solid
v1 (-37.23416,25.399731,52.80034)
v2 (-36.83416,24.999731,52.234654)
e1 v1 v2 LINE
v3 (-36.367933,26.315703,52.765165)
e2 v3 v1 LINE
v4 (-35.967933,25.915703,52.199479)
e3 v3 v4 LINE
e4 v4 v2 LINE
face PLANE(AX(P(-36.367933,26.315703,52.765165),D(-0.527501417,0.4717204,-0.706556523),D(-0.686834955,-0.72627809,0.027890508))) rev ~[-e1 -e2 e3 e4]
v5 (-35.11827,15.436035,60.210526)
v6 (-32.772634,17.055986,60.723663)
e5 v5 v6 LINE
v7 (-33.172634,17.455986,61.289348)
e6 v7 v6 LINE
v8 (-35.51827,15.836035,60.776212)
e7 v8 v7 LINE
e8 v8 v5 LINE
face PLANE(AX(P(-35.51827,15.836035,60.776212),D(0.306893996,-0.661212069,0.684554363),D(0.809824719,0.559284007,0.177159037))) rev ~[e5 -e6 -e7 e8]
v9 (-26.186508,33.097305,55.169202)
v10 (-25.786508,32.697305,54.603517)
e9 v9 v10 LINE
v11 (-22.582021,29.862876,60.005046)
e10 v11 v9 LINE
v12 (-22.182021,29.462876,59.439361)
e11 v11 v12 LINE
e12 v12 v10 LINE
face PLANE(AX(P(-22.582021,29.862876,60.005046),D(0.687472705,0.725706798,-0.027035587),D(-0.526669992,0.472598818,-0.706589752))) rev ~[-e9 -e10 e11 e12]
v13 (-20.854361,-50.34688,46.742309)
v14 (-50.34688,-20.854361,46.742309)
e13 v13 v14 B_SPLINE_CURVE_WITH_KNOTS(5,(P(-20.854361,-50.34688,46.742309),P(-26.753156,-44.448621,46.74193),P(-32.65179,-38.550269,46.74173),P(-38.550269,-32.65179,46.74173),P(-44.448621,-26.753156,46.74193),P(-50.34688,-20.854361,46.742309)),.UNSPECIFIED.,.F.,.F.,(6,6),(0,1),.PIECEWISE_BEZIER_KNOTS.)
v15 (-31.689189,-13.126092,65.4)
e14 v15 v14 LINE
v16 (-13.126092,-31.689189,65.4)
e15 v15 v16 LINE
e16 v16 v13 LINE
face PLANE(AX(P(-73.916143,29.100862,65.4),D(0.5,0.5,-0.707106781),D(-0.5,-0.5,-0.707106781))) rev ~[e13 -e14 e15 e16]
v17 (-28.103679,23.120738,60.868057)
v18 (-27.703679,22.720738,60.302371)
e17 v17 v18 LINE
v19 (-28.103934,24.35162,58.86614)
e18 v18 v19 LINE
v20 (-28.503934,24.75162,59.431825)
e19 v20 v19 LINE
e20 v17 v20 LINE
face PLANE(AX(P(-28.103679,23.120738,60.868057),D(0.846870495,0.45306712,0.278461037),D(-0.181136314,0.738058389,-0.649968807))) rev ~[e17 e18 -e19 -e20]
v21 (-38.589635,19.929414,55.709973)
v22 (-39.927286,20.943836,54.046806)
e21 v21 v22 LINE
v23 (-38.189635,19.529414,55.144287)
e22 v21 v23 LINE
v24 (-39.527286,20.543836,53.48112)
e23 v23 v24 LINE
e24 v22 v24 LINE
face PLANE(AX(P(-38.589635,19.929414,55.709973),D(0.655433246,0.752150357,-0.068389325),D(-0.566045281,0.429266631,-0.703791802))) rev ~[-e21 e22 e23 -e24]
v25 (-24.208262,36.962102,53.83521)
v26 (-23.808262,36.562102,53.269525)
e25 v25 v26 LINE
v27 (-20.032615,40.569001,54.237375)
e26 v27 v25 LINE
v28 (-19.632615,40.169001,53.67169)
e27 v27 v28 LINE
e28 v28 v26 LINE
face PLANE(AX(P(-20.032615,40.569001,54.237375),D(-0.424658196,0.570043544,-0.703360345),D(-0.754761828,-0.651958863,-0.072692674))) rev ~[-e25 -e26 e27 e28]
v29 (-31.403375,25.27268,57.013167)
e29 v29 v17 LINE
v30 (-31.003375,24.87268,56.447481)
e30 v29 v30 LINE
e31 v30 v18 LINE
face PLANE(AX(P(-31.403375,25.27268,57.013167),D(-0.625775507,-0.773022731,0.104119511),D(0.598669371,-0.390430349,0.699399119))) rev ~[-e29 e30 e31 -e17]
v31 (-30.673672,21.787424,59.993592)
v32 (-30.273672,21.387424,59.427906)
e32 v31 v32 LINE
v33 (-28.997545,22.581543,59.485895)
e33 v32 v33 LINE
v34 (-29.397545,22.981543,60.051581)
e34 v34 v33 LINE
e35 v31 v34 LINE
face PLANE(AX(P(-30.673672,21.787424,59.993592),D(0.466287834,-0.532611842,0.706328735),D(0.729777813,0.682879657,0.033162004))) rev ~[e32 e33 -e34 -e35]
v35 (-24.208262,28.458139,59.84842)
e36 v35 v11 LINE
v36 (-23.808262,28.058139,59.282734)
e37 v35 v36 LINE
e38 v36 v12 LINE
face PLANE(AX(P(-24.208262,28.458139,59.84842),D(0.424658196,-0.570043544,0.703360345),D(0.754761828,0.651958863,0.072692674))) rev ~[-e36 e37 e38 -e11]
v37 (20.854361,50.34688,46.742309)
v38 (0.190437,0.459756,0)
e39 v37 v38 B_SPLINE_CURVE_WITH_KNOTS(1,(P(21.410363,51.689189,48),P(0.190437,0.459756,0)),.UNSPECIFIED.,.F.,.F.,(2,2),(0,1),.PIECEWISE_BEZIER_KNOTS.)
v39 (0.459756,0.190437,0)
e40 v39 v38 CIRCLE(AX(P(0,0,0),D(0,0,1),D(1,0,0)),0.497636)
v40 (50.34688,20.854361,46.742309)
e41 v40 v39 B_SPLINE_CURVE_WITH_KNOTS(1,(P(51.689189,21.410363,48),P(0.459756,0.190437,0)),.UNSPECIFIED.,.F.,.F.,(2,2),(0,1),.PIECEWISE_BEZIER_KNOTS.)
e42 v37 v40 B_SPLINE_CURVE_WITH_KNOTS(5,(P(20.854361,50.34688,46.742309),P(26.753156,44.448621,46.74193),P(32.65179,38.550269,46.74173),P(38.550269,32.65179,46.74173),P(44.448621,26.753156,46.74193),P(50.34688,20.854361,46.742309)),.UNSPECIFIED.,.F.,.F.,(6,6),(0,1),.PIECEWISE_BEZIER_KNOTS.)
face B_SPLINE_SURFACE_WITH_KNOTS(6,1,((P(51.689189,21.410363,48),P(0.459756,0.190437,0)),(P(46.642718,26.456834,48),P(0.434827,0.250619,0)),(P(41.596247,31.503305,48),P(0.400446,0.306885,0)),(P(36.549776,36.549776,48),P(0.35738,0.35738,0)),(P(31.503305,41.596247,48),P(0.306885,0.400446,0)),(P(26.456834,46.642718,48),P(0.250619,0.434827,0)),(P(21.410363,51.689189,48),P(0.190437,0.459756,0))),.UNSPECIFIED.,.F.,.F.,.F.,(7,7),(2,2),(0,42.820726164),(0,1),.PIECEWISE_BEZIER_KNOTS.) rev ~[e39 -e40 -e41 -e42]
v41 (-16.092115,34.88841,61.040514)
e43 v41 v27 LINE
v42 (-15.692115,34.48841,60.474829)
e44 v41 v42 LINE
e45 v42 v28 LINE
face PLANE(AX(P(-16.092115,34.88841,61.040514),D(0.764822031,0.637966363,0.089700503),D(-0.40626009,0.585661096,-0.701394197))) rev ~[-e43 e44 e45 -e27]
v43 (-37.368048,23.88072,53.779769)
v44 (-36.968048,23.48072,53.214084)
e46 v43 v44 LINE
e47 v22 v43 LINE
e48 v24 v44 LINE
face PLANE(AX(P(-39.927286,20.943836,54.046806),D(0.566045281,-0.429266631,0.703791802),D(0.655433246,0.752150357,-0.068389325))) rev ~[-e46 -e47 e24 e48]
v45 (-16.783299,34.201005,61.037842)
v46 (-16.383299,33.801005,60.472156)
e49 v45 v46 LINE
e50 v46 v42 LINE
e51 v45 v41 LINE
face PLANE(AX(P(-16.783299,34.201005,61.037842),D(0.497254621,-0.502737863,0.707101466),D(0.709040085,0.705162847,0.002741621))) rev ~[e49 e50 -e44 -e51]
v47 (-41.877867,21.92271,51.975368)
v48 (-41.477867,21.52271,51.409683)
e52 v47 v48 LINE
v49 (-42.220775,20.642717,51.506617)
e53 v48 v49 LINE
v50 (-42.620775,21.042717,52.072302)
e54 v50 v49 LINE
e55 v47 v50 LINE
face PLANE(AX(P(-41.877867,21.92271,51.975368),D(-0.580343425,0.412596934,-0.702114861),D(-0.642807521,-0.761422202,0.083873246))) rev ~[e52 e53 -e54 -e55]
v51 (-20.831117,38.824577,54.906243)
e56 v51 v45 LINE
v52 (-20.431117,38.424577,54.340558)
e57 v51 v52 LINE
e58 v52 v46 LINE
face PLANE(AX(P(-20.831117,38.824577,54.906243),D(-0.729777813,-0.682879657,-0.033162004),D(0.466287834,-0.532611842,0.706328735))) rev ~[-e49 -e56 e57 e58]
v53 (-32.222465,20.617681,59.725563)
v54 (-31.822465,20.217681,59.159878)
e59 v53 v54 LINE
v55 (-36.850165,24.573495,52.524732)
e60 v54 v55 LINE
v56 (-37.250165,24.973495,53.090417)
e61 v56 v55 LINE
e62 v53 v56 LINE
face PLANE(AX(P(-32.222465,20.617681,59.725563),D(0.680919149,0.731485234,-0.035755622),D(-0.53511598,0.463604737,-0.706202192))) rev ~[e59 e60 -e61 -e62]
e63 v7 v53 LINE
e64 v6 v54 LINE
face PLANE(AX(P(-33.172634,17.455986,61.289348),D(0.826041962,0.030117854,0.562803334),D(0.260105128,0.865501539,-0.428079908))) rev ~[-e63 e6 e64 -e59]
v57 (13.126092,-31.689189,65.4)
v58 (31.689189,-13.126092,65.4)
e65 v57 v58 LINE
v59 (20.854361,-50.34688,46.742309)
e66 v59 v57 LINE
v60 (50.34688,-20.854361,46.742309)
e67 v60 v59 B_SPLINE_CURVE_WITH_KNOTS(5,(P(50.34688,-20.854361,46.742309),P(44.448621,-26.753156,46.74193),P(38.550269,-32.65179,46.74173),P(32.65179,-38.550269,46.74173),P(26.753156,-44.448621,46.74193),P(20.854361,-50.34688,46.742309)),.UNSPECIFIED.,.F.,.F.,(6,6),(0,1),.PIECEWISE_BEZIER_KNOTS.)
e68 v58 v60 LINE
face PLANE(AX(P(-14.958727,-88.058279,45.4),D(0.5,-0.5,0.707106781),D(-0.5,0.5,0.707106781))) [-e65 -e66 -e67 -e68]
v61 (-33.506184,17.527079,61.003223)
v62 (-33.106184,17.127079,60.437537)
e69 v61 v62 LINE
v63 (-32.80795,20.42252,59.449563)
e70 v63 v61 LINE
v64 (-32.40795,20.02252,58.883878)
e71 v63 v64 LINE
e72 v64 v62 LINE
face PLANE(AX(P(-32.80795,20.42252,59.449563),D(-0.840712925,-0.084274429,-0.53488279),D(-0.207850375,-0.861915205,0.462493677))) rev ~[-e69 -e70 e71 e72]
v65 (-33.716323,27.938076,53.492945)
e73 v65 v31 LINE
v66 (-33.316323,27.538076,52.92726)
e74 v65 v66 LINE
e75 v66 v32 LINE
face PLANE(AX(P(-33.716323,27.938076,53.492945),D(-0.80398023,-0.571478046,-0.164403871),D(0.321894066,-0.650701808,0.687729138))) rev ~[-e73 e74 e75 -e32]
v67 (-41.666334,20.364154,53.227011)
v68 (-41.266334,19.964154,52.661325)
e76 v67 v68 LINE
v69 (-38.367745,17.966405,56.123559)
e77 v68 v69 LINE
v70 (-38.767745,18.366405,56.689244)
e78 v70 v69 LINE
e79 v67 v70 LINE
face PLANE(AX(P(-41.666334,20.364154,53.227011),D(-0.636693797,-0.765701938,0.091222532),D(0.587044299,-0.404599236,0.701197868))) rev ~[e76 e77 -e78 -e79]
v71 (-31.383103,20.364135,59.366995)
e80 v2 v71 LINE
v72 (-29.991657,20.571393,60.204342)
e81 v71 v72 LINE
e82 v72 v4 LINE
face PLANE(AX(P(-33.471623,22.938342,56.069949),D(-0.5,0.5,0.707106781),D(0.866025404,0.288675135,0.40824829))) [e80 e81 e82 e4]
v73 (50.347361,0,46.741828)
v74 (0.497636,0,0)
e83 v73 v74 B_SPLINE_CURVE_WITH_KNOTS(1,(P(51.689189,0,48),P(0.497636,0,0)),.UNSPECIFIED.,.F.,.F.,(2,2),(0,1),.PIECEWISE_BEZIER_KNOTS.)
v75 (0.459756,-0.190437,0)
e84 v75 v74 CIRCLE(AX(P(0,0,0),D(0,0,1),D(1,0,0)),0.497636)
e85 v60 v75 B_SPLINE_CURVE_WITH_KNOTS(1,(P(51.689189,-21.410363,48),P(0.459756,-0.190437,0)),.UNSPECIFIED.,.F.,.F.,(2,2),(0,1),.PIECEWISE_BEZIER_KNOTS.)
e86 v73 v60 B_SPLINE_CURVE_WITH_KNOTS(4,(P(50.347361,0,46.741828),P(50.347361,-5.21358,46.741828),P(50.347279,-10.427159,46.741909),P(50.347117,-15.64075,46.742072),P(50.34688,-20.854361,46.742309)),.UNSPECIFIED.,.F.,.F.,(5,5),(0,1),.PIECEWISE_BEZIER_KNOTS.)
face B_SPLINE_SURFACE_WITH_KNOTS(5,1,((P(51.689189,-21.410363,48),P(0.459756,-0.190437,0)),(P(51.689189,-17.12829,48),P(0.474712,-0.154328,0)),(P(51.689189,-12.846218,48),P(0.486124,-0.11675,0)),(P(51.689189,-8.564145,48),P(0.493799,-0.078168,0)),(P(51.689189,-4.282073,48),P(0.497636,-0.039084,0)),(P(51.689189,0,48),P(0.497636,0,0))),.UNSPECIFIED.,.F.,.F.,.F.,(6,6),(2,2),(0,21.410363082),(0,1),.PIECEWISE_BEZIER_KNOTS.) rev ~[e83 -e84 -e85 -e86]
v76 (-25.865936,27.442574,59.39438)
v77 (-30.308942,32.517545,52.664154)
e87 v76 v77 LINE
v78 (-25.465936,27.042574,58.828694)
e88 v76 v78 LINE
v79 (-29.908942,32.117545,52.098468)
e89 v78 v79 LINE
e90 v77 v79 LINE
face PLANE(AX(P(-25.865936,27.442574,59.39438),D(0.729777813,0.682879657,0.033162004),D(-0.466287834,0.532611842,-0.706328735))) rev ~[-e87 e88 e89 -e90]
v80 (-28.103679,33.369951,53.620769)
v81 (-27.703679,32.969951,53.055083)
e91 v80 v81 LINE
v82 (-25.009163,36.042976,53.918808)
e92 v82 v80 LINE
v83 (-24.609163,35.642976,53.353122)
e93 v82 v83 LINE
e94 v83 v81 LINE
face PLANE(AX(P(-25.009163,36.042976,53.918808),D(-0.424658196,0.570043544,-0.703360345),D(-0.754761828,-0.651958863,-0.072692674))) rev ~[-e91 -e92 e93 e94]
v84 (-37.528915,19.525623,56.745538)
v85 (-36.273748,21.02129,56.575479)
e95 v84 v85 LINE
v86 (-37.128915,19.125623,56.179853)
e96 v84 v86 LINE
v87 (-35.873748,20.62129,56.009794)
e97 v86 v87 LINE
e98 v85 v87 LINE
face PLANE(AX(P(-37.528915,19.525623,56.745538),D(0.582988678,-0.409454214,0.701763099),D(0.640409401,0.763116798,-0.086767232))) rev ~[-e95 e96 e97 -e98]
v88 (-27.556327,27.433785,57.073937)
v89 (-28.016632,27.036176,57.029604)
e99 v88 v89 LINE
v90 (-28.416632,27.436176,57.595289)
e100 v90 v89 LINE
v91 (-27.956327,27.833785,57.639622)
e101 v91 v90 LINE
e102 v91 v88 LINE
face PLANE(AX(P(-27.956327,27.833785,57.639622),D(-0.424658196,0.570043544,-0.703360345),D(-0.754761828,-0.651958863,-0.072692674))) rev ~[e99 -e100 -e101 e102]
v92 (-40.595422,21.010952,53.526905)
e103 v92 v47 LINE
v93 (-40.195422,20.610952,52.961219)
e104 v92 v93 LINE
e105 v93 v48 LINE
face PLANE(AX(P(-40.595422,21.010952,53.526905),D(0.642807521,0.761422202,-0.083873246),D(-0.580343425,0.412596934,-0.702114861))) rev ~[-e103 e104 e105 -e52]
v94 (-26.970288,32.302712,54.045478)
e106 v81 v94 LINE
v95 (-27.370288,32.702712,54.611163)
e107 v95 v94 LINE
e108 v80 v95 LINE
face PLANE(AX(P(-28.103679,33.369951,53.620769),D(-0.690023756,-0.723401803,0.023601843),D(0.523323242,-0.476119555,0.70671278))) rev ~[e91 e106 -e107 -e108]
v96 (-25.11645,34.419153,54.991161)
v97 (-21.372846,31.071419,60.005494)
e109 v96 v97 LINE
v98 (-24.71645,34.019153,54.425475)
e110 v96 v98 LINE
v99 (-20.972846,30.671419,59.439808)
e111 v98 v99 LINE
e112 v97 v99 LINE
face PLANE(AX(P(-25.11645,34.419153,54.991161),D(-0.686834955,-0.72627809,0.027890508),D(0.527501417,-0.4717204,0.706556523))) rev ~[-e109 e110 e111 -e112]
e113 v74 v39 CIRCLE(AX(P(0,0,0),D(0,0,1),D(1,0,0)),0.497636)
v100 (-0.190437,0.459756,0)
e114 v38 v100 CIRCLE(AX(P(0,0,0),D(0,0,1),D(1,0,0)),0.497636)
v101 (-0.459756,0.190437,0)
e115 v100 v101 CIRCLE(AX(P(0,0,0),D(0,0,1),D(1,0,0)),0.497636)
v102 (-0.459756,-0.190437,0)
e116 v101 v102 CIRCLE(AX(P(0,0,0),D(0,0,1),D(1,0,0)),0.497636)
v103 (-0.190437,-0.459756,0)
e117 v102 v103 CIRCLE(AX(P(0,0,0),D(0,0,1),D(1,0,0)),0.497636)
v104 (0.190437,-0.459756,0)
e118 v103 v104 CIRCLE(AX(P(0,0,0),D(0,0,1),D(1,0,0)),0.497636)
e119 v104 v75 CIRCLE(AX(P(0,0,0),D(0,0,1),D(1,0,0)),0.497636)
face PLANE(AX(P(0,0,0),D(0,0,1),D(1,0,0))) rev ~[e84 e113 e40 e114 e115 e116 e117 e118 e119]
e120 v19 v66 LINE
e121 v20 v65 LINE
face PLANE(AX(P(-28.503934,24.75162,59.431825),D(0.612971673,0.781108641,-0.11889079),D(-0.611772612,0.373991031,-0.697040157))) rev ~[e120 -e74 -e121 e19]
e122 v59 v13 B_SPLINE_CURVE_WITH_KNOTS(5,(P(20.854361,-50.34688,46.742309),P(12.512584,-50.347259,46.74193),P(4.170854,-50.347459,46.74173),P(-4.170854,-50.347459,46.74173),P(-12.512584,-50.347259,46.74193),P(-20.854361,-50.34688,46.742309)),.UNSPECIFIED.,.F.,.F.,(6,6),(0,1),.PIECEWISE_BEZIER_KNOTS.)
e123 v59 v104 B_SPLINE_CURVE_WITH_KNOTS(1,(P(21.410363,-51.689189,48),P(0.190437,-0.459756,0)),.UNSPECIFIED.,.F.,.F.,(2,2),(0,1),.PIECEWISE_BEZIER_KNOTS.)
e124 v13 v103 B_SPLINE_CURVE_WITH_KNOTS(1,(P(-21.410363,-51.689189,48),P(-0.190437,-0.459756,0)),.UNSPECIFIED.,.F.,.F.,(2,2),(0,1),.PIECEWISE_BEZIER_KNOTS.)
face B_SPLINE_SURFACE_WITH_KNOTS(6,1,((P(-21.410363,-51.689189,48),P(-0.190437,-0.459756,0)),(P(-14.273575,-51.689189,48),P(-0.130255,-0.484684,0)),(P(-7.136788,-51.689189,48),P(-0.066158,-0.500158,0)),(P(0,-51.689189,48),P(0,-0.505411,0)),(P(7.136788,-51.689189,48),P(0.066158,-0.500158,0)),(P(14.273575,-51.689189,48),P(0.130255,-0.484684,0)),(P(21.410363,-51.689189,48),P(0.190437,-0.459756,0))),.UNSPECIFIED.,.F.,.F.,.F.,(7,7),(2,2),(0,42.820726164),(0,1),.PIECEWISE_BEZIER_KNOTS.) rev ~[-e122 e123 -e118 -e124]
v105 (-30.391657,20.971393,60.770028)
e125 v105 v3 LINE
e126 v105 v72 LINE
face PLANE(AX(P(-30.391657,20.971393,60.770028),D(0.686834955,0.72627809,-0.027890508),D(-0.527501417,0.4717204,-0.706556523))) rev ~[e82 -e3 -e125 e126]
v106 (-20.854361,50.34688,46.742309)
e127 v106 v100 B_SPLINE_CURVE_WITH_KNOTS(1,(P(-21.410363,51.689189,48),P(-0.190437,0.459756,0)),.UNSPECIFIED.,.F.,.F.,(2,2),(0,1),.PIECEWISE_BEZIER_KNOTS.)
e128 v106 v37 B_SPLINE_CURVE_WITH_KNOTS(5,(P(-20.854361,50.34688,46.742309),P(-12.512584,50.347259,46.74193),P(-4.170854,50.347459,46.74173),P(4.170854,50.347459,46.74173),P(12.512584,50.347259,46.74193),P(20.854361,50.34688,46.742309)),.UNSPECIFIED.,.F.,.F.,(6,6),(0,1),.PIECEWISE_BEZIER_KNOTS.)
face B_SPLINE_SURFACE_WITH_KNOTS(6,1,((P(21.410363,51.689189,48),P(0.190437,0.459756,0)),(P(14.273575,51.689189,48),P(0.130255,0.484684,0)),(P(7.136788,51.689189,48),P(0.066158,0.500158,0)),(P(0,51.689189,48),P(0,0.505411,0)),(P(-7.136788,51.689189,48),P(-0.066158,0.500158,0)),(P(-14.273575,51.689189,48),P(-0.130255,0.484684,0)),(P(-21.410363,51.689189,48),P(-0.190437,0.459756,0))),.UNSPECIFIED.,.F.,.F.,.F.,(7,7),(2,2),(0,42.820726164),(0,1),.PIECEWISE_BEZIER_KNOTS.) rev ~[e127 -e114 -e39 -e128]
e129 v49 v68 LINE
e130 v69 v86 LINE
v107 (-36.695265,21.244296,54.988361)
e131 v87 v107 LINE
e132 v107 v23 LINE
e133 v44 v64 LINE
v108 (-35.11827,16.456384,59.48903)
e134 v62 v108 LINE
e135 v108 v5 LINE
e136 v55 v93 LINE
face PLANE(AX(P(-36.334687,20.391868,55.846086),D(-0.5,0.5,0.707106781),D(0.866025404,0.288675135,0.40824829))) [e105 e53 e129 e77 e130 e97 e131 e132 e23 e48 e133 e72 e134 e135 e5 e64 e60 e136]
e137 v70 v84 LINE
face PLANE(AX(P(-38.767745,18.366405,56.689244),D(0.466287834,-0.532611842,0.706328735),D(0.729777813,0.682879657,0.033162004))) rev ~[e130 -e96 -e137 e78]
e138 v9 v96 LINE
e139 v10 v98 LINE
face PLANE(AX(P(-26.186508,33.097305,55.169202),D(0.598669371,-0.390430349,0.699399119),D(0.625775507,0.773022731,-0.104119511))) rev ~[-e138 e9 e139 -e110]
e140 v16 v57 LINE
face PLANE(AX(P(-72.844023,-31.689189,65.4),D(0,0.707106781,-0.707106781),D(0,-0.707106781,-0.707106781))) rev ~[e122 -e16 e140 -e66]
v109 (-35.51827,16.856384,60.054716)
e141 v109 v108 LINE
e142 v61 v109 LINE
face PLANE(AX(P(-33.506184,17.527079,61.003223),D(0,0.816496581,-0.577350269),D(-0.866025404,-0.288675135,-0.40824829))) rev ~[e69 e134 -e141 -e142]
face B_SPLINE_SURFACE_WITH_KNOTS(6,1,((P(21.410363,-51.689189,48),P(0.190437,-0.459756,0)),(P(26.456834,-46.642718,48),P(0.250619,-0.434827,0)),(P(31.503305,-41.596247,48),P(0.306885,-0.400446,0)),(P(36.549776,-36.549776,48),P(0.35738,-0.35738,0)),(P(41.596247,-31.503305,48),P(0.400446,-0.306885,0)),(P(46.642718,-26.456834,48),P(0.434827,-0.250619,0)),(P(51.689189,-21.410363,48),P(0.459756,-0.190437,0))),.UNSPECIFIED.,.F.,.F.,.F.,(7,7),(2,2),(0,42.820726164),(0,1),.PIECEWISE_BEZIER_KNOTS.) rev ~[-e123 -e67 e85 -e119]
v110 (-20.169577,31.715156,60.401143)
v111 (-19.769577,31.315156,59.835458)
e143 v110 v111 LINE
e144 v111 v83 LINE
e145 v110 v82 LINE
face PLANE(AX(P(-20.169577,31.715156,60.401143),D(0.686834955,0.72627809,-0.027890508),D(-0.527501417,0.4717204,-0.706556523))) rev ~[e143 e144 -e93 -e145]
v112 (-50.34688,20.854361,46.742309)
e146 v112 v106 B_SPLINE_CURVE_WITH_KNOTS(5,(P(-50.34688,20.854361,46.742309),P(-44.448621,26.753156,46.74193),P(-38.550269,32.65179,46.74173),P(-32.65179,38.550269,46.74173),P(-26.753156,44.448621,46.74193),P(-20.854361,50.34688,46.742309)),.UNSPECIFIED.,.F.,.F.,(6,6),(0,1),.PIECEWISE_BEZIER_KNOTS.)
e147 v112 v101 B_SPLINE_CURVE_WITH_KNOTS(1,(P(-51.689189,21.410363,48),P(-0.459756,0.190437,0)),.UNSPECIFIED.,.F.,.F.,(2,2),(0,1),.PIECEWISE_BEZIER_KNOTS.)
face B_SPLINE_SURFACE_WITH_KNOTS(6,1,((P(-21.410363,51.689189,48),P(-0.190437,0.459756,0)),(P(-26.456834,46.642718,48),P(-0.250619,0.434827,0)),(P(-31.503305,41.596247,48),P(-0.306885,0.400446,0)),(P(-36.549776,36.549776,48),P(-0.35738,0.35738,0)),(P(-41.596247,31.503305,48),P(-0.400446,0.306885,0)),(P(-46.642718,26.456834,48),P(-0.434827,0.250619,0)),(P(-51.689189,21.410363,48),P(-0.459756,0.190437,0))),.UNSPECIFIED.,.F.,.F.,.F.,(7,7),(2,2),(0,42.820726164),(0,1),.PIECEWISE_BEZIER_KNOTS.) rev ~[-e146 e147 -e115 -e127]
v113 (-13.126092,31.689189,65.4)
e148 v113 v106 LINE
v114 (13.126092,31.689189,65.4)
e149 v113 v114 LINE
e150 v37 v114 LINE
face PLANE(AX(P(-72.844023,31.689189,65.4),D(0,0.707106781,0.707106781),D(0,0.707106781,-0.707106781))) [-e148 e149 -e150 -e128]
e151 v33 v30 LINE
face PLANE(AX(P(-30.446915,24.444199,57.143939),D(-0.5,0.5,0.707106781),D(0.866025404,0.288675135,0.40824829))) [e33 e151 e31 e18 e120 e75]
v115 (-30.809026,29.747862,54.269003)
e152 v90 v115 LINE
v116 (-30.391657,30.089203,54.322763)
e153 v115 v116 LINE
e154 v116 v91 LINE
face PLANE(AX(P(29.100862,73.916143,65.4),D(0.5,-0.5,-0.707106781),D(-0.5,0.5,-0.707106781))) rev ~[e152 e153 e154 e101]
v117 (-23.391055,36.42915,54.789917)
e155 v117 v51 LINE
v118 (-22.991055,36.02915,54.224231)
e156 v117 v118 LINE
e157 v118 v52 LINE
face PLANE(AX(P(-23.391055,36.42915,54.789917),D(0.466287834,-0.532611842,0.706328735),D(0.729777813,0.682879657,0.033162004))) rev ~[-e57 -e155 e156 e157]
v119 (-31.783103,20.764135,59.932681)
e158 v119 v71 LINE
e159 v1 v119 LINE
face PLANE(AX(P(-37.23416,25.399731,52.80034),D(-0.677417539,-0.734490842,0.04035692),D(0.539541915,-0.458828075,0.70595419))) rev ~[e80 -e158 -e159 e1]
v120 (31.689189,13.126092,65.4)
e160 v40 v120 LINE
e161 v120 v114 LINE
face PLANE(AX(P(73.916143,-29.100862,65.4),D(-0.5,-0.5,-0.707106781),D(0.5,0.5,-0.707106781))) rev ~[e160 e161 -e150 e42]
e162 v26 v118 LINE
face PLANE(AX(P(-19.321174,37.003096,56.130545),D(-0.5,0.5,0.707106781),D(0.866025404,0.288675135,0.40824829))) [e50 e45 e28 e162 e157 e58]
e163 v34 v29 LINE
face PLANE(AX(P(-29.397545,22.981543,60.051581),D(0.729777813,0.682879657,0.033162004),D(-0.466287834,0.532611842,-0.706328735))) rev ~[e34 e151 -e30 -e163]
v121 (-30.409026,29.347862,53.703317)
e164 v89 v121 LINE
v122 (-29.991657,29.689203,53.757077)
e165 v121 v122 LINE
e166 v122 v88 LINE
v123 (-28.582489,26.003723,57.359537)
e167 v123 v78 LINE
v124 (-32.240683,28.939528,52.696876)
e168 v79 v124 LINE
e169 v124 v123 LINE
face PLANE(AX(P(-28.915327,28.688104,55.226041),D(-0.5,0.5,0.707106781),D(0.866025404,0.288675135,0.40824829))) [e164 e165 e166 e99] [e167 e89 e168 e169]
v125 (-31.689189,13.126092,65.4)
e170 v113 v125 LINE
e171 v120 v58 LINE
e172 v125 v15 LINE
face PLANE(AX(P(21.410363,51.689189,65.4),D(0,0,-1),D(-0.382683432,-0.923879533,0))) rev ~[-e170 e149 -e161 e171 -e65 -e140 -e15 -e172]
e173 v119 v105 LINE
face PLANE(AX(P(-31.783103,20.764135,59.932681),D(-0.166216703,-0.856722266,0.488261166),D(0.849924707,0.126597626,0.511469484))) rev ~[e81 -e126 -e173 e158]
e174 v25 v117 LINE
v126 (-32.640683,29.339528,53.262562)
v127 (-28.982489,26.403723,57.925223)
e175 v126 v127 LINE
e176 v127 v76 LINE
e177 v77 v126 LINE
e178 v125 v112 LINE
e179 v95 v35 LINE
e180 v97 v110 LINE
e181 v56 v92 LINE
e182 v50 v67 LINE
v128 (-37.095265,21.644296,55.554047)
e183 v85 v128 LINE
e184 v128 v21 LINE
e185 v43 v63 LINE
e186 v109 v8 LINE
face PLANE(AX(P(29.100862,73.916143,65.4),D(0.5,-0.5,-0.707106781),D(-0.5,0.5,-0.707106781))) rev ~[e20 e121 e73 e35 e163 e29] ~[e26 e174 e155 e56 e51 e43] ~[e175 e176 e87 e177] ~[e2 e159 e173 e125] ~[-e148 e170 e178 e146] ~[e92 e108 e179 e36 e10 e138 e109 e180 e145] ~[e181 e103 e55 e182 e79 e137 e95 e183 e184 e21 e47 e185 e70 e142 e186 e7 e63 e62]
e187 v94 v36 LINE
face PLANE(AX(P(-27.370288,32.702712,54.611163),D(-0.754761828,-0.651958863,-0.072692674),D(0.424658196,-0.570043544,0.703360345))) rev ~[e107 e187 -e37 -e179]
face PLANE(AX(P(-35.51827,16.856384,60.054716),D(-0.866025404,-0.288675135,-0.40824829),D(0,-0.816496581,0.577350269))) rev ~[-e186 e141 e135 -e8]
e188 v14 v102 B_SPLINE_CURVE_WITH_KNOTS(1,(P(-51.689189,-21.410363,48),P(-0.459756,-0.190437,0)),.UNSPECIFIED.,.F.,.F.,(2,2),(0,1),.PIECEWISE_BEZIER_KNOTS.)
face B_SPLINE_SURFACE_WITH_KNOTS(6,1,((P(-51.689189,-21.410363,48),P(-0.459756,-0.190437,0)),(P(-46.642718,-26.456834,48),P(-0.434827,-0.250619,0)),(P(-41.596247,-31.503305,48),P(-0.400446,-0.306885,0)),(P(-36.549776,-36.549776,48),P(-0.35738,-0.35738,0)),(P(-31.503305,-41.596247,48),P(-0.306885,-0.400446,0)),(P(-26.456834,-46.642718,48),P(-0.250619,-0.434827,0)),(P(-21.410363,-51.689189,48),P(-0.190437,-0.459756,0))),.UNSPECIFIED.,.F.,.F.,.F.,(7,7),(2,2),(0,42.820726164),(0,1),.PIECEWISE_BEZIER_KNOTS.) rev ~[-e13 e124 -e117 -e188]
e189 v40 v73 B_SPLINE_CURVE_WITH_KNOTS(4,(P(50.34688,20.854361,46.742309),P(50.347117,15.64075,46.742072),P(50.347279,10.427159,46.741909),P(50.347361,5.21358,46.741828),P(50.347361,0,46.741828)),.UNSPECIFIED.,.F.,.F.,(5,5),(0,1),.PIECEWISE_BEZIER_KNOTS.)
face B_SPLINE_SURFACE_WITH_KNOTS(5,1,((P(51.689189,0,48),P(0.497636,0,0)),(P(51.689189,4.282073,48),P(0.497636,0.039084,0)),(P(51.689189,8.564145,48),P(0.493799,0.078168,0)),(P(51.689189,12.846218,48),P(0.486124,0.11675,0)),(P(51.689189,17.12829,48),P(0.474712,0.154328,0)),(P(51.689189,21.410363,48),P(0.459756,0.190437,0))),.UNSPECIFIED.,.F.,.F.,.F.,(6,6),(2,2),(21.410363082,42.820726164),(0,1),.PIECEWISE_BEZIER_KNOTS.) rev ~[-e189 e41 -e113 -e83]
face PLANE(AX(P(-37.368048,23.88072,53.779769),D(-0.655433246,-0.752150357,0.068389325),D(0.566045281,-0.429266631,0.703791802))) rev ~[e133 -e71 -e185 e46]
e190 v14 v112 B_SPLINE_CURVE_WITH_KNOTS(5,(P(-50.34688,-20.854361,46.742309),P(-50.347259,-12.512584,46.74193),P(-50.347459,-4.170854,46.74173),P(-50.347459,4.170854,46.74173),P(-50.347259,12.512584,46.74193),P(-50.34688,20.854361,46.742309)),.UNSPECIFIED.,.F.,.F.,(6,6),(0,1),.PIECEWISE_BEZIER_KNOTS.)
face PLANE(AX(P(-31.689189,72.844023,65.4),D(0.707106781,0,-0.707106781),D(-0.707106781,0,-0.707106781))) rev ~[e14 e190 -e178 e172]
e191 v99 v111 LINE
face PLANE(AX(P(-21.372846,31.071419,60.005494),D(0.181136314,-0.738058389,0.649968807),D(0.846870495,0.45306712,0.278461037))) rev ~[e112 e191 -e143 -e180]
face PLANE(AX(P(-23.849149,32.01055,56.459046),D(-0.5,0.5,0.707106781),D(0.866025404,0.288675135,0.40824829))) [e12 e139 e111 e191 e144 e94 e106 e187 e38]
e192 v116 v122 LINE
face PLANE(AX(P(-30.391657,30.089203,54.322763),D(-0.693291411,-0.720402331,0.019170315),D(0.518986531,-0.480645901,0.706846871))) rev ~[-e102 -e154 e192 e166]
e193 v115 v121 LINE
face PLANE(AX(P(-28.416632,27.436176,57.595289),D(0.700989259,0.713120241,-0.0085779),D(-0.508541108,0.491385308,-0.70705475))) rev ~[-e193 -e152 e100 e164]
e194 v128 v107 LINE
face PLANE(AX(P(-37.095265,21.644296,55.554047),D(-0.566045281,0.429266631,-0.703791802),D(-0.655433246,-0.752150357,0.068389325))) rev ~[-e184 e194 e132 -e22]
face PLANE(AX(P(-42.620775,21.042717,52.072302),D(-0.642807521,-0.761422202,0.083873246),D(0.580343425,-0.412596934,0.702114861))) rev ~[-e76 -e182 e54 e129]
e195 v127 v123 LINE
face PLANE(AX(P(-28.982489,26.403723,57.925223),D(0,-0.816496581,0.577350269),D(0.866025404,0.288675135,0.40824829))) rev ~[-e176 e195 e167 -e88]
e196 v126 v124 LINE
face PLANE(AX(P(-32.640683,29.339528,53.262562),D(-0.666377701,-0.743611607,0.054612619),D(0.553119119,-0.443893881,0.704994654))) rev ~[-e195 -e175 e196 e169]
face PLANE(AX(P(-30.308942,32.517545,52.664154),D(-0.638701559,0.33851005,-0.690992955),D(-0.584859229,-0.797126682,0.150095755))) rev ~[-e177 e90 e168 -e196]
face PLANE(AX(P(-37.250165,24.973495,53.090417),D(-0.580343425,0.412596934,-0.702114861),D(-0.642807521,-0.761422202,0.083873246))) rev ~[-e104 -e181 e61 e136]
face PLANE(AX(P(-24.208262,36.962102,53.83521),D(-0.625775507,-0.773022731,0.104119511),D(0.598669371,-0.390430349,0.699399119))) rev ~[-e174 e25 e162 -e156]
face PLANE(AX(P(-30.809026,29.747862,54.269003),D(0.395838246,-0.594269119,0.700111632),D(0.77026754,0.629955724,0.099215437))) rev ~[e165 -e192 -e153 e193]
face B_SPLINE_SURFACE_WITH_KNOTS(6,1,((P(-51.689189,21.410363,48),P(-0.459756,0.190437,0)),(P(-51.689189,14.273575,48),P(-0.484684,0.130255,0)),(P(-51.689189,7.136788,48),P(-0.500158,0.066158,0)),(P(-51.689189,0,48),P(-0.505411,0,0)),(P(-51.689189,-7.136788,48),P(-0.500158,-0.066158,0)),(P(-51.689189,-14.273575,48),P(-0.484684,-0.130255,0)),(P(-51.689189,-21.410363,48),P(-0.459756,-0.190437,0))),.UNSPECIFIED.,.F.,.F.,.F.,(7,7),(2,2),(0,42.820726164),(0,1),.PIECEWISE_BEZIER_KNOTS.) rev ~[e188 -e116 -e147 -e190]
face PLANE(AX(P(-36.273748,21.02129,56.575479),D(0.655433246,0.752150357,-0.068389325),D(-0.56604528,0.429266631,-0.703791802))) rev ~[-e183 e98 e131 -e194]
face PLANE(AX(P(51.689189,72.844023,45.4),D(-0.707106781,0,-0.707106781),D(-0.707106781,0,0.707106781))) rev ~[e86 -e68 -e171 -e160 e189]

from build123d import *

# Parameters (mm, degrees)
F0_R         = 0.4976358306
F4_DEPTH     = 17.4
F5_T1_DEPTH  = 145.6880456822
F5_T3_DEPTH  = 145.6880456822
F5_T5_DEPTH  = 145.6880456822
F5_T7_DEPTH  = 145.6880456822
F5_T9_DEPTH  = 145.6880456822
F5_T11_DEPTH = 145.6880456822
F7_DEPTH     = 0.8


# Not quite as in the source:
# - a fillet or chamfer that OpenCascade refuses, or shapes differently, is made with other operations: its cross-section is extruded or revolved along the edge and cut away or added


with BuildPart() as f3:
    # F2 (on offset) → F3 section 0
    with BuildSketch(Plane.XY.offset(48)):
        Polygon((21.4103630818, 51.6891889274), (-21.4103630818, 51.6891889274), (-51.6891889274, 21.4103630818), (-51.6891889274, -21.4103630818), (-21.4103630818, -51.6891889274), (21.4103630818, -51.6891889274), (51.6891889274, -21.4103630818), (51.6891889274, 21.4103630818), align=None)
    # F0 (on Top) → F3 section 1
    with BuildSketch(Plane.XY):
        Circle(F0_R)
    loft()

    # F4 (add): a face of the model
    f4_faces = [f3.faces().sort_by_distance(p)[0] for p in [
        (0, 0, 48),
    ]]
    extrude(f4_faces, amount=F4_DEPTH)

    # F5: chamfer of 20 on 8 edges, made by hand

    # F5_s2 → F5_t1 (cut)
    with BuildSketch(Plane(origin=(-51.5085025199, -51.5085025199, 0), x_dir=(0, 0, 1), z_dir=(0.7071067812, 0.7071067812, 0))):
        Polygon((45.4, 51.6891889274), (65.4, 31.6891889274), (65.4, 51.6891889274), align=None)
    extrude(amount=F5_T1_DEPTH, mode=Mode.SUBTRACT)

    # F5_s4 → F5_t3 (cut)
    with BuildSketch(Plane.YZ.offset(-72.8440228411)):
        Polygon((-31.6891889274, 65.4), (-51.6891889274, 45.4), (-51.6891889274, 65.4), align=None)
        Polygon((31.6891889274, 65.4), (51.6891889274, 45.4), (51.6891889274, 65.4), align=None)
    extrude(amount=F5_T3_DEPTH, mode=Mode.SUBTRACT)

    # F5_s6 → F5_t5 (cut)
    with BuildSketch(Plane(origin=(-51.5085025199, 51.5085025199, 0), x_dir=(0, 0, 1), z_dir=(0.7071067812, -0.7071067812, 0))):
        Polygon((65.4, 31.6891889274), (45.4, 51.6891889274), (65.4, 51.6891889274), align=None)
    extrude(amount=F5_T5_DEPTH, mode=Mode.SUBTRACT)

    # F5_s8 → F5_t7 (cut)
    with BuildSketch(Plane.XZ.offset(-72.8440228411)):
        Polygon((51.6891889274, 45.4), (31.6891889274, 65.4), (51.6891889274, 65.4), align=None)
        Polygon((-31.6891889274, 65.4), (-51.6891889274, 45.4), (-51.6891889274, 65.4), align=None)
    extrude(amount=F5_T7_DEPTH, mode=Mode.SUBTRACT)

    # F5_s10 → F5_t9 (cut)
    with BuildSketch(Plane(origin=(51.5085025199, 51.5085025199, 0), x_dir=(0, 0, 1), z_dir=(-0.7071067812, -0.7071067812, 0))):
        Polygon((65.4, 31.6891889274), (45.4, 51.6891889274), (65.4, 51.6891889274), align=None)
    extrude(amount=F5_T9_DEPTH, mode=Mode.SUBTRACT)

    # F5_s12 → F5_t11 (cut)
    with BuildSketch(Plane(origin=(51.5085025199, -51.5085025199, 0), x_dir=(0, 0, 1), z_dir=(-0.7071067812, 0.7071067812, 0))):
        Polygon((65.4, 31.6891889274), (45.4, 51.6891889274), (65.4, 51.6891889274), align=None)
    extrude(amount=F5_T11_DEPTH, mode=Mode.SUBTRACT)

    # F6 (on face) → F7 (cut)
    with BuildSketch(Plane(origin=(-34.3262119352, 34.3262119352, 48.5445944637), x_dir=(0.8660254038, 0.2886751346, 0.4082482905), z_dir=(-0.5, 0.5, 0.7071067812))):
        Polygon((20.256810503, -7.3152106315), (21.0549216717, -6.755489856), (16.5048241615, 1.810487709), (11.6832025843, -0.902343074), (12.6268315784, -1.8886970465), (15.5827937516, 0), align=None)
        Polygon((7.1851625107, -3.7115143208), (8.0320088518, -4.8281169212), (11.6832025843, -11.3175281272), (13.5610239533, -10.2609931974), (9.3989199392, -4.8281169212), (10.6345172528, -3.6460408281), (14.9572589197, -9.2744808388), (16.3466744125, -8.9773000983), (10.7584019824, -1.7010715934), align=None)
        Polygon((6.170399487, -11.8845931934), (9.7690848634, -11.8845931934), (4.6387440525, -3.8551988546), (1.9462815717, -6.7955303045), align=None)
        Polygon((4.0612965822, -7.0431958884), (4.5432327315, -6.7955303045), (7.355309773, -10.5520610512), (6.8237950711, -10.8511117796), align=None, mode=Mode.SUBTRACT)
        Polygon((7.1851625107, -16.2641853094), (6.7229871638, -14.1033669934), (0.7042393052, -8.0728225242), (4.2175897397, -16.8479587883), (5.6911348405, -15.9064446157), (3.3750016382, -12.2815106186), align=None)
        Polygon((2.9365293457, -17.6483038813), (4.5432327315, -17.9625210545), (-2.3575761854, -8.9773000983), (-3.3578095237, -9.7454970267), align=None)
        Polygon((0.946887175, -20.9094267339), (-1.3764705509, -20.9094267339), (-1.3764705509, -22.1590939909), (1.3320371509, -21.1326684803), (2.4291982409, -17.6483038813), (-3.3762898288, -10.2609931974), (-7.2390597263, -13.7484027895), (-8.7199002404, -12.10817499), (-9.5777362585, -12.8826517612), (-8.4756426513, -14.1033669934), (-5.128640122, -17.7334435545), (-3.6981627345, -16.819447279), (-2.2488206246, -15.5000568389), (-3.1974268837, -14.4016498716), (-4.9229765081, -15.8918690917), (-6.4675627457, -14.1033669934), (-3.5124101047, -11.5512379779), (1.7531381398, -17.6483038813), align=None)
    extrude(amount=-F7_DEPTH, mode=Mode.SUBTRACT)


solid = f3.part
